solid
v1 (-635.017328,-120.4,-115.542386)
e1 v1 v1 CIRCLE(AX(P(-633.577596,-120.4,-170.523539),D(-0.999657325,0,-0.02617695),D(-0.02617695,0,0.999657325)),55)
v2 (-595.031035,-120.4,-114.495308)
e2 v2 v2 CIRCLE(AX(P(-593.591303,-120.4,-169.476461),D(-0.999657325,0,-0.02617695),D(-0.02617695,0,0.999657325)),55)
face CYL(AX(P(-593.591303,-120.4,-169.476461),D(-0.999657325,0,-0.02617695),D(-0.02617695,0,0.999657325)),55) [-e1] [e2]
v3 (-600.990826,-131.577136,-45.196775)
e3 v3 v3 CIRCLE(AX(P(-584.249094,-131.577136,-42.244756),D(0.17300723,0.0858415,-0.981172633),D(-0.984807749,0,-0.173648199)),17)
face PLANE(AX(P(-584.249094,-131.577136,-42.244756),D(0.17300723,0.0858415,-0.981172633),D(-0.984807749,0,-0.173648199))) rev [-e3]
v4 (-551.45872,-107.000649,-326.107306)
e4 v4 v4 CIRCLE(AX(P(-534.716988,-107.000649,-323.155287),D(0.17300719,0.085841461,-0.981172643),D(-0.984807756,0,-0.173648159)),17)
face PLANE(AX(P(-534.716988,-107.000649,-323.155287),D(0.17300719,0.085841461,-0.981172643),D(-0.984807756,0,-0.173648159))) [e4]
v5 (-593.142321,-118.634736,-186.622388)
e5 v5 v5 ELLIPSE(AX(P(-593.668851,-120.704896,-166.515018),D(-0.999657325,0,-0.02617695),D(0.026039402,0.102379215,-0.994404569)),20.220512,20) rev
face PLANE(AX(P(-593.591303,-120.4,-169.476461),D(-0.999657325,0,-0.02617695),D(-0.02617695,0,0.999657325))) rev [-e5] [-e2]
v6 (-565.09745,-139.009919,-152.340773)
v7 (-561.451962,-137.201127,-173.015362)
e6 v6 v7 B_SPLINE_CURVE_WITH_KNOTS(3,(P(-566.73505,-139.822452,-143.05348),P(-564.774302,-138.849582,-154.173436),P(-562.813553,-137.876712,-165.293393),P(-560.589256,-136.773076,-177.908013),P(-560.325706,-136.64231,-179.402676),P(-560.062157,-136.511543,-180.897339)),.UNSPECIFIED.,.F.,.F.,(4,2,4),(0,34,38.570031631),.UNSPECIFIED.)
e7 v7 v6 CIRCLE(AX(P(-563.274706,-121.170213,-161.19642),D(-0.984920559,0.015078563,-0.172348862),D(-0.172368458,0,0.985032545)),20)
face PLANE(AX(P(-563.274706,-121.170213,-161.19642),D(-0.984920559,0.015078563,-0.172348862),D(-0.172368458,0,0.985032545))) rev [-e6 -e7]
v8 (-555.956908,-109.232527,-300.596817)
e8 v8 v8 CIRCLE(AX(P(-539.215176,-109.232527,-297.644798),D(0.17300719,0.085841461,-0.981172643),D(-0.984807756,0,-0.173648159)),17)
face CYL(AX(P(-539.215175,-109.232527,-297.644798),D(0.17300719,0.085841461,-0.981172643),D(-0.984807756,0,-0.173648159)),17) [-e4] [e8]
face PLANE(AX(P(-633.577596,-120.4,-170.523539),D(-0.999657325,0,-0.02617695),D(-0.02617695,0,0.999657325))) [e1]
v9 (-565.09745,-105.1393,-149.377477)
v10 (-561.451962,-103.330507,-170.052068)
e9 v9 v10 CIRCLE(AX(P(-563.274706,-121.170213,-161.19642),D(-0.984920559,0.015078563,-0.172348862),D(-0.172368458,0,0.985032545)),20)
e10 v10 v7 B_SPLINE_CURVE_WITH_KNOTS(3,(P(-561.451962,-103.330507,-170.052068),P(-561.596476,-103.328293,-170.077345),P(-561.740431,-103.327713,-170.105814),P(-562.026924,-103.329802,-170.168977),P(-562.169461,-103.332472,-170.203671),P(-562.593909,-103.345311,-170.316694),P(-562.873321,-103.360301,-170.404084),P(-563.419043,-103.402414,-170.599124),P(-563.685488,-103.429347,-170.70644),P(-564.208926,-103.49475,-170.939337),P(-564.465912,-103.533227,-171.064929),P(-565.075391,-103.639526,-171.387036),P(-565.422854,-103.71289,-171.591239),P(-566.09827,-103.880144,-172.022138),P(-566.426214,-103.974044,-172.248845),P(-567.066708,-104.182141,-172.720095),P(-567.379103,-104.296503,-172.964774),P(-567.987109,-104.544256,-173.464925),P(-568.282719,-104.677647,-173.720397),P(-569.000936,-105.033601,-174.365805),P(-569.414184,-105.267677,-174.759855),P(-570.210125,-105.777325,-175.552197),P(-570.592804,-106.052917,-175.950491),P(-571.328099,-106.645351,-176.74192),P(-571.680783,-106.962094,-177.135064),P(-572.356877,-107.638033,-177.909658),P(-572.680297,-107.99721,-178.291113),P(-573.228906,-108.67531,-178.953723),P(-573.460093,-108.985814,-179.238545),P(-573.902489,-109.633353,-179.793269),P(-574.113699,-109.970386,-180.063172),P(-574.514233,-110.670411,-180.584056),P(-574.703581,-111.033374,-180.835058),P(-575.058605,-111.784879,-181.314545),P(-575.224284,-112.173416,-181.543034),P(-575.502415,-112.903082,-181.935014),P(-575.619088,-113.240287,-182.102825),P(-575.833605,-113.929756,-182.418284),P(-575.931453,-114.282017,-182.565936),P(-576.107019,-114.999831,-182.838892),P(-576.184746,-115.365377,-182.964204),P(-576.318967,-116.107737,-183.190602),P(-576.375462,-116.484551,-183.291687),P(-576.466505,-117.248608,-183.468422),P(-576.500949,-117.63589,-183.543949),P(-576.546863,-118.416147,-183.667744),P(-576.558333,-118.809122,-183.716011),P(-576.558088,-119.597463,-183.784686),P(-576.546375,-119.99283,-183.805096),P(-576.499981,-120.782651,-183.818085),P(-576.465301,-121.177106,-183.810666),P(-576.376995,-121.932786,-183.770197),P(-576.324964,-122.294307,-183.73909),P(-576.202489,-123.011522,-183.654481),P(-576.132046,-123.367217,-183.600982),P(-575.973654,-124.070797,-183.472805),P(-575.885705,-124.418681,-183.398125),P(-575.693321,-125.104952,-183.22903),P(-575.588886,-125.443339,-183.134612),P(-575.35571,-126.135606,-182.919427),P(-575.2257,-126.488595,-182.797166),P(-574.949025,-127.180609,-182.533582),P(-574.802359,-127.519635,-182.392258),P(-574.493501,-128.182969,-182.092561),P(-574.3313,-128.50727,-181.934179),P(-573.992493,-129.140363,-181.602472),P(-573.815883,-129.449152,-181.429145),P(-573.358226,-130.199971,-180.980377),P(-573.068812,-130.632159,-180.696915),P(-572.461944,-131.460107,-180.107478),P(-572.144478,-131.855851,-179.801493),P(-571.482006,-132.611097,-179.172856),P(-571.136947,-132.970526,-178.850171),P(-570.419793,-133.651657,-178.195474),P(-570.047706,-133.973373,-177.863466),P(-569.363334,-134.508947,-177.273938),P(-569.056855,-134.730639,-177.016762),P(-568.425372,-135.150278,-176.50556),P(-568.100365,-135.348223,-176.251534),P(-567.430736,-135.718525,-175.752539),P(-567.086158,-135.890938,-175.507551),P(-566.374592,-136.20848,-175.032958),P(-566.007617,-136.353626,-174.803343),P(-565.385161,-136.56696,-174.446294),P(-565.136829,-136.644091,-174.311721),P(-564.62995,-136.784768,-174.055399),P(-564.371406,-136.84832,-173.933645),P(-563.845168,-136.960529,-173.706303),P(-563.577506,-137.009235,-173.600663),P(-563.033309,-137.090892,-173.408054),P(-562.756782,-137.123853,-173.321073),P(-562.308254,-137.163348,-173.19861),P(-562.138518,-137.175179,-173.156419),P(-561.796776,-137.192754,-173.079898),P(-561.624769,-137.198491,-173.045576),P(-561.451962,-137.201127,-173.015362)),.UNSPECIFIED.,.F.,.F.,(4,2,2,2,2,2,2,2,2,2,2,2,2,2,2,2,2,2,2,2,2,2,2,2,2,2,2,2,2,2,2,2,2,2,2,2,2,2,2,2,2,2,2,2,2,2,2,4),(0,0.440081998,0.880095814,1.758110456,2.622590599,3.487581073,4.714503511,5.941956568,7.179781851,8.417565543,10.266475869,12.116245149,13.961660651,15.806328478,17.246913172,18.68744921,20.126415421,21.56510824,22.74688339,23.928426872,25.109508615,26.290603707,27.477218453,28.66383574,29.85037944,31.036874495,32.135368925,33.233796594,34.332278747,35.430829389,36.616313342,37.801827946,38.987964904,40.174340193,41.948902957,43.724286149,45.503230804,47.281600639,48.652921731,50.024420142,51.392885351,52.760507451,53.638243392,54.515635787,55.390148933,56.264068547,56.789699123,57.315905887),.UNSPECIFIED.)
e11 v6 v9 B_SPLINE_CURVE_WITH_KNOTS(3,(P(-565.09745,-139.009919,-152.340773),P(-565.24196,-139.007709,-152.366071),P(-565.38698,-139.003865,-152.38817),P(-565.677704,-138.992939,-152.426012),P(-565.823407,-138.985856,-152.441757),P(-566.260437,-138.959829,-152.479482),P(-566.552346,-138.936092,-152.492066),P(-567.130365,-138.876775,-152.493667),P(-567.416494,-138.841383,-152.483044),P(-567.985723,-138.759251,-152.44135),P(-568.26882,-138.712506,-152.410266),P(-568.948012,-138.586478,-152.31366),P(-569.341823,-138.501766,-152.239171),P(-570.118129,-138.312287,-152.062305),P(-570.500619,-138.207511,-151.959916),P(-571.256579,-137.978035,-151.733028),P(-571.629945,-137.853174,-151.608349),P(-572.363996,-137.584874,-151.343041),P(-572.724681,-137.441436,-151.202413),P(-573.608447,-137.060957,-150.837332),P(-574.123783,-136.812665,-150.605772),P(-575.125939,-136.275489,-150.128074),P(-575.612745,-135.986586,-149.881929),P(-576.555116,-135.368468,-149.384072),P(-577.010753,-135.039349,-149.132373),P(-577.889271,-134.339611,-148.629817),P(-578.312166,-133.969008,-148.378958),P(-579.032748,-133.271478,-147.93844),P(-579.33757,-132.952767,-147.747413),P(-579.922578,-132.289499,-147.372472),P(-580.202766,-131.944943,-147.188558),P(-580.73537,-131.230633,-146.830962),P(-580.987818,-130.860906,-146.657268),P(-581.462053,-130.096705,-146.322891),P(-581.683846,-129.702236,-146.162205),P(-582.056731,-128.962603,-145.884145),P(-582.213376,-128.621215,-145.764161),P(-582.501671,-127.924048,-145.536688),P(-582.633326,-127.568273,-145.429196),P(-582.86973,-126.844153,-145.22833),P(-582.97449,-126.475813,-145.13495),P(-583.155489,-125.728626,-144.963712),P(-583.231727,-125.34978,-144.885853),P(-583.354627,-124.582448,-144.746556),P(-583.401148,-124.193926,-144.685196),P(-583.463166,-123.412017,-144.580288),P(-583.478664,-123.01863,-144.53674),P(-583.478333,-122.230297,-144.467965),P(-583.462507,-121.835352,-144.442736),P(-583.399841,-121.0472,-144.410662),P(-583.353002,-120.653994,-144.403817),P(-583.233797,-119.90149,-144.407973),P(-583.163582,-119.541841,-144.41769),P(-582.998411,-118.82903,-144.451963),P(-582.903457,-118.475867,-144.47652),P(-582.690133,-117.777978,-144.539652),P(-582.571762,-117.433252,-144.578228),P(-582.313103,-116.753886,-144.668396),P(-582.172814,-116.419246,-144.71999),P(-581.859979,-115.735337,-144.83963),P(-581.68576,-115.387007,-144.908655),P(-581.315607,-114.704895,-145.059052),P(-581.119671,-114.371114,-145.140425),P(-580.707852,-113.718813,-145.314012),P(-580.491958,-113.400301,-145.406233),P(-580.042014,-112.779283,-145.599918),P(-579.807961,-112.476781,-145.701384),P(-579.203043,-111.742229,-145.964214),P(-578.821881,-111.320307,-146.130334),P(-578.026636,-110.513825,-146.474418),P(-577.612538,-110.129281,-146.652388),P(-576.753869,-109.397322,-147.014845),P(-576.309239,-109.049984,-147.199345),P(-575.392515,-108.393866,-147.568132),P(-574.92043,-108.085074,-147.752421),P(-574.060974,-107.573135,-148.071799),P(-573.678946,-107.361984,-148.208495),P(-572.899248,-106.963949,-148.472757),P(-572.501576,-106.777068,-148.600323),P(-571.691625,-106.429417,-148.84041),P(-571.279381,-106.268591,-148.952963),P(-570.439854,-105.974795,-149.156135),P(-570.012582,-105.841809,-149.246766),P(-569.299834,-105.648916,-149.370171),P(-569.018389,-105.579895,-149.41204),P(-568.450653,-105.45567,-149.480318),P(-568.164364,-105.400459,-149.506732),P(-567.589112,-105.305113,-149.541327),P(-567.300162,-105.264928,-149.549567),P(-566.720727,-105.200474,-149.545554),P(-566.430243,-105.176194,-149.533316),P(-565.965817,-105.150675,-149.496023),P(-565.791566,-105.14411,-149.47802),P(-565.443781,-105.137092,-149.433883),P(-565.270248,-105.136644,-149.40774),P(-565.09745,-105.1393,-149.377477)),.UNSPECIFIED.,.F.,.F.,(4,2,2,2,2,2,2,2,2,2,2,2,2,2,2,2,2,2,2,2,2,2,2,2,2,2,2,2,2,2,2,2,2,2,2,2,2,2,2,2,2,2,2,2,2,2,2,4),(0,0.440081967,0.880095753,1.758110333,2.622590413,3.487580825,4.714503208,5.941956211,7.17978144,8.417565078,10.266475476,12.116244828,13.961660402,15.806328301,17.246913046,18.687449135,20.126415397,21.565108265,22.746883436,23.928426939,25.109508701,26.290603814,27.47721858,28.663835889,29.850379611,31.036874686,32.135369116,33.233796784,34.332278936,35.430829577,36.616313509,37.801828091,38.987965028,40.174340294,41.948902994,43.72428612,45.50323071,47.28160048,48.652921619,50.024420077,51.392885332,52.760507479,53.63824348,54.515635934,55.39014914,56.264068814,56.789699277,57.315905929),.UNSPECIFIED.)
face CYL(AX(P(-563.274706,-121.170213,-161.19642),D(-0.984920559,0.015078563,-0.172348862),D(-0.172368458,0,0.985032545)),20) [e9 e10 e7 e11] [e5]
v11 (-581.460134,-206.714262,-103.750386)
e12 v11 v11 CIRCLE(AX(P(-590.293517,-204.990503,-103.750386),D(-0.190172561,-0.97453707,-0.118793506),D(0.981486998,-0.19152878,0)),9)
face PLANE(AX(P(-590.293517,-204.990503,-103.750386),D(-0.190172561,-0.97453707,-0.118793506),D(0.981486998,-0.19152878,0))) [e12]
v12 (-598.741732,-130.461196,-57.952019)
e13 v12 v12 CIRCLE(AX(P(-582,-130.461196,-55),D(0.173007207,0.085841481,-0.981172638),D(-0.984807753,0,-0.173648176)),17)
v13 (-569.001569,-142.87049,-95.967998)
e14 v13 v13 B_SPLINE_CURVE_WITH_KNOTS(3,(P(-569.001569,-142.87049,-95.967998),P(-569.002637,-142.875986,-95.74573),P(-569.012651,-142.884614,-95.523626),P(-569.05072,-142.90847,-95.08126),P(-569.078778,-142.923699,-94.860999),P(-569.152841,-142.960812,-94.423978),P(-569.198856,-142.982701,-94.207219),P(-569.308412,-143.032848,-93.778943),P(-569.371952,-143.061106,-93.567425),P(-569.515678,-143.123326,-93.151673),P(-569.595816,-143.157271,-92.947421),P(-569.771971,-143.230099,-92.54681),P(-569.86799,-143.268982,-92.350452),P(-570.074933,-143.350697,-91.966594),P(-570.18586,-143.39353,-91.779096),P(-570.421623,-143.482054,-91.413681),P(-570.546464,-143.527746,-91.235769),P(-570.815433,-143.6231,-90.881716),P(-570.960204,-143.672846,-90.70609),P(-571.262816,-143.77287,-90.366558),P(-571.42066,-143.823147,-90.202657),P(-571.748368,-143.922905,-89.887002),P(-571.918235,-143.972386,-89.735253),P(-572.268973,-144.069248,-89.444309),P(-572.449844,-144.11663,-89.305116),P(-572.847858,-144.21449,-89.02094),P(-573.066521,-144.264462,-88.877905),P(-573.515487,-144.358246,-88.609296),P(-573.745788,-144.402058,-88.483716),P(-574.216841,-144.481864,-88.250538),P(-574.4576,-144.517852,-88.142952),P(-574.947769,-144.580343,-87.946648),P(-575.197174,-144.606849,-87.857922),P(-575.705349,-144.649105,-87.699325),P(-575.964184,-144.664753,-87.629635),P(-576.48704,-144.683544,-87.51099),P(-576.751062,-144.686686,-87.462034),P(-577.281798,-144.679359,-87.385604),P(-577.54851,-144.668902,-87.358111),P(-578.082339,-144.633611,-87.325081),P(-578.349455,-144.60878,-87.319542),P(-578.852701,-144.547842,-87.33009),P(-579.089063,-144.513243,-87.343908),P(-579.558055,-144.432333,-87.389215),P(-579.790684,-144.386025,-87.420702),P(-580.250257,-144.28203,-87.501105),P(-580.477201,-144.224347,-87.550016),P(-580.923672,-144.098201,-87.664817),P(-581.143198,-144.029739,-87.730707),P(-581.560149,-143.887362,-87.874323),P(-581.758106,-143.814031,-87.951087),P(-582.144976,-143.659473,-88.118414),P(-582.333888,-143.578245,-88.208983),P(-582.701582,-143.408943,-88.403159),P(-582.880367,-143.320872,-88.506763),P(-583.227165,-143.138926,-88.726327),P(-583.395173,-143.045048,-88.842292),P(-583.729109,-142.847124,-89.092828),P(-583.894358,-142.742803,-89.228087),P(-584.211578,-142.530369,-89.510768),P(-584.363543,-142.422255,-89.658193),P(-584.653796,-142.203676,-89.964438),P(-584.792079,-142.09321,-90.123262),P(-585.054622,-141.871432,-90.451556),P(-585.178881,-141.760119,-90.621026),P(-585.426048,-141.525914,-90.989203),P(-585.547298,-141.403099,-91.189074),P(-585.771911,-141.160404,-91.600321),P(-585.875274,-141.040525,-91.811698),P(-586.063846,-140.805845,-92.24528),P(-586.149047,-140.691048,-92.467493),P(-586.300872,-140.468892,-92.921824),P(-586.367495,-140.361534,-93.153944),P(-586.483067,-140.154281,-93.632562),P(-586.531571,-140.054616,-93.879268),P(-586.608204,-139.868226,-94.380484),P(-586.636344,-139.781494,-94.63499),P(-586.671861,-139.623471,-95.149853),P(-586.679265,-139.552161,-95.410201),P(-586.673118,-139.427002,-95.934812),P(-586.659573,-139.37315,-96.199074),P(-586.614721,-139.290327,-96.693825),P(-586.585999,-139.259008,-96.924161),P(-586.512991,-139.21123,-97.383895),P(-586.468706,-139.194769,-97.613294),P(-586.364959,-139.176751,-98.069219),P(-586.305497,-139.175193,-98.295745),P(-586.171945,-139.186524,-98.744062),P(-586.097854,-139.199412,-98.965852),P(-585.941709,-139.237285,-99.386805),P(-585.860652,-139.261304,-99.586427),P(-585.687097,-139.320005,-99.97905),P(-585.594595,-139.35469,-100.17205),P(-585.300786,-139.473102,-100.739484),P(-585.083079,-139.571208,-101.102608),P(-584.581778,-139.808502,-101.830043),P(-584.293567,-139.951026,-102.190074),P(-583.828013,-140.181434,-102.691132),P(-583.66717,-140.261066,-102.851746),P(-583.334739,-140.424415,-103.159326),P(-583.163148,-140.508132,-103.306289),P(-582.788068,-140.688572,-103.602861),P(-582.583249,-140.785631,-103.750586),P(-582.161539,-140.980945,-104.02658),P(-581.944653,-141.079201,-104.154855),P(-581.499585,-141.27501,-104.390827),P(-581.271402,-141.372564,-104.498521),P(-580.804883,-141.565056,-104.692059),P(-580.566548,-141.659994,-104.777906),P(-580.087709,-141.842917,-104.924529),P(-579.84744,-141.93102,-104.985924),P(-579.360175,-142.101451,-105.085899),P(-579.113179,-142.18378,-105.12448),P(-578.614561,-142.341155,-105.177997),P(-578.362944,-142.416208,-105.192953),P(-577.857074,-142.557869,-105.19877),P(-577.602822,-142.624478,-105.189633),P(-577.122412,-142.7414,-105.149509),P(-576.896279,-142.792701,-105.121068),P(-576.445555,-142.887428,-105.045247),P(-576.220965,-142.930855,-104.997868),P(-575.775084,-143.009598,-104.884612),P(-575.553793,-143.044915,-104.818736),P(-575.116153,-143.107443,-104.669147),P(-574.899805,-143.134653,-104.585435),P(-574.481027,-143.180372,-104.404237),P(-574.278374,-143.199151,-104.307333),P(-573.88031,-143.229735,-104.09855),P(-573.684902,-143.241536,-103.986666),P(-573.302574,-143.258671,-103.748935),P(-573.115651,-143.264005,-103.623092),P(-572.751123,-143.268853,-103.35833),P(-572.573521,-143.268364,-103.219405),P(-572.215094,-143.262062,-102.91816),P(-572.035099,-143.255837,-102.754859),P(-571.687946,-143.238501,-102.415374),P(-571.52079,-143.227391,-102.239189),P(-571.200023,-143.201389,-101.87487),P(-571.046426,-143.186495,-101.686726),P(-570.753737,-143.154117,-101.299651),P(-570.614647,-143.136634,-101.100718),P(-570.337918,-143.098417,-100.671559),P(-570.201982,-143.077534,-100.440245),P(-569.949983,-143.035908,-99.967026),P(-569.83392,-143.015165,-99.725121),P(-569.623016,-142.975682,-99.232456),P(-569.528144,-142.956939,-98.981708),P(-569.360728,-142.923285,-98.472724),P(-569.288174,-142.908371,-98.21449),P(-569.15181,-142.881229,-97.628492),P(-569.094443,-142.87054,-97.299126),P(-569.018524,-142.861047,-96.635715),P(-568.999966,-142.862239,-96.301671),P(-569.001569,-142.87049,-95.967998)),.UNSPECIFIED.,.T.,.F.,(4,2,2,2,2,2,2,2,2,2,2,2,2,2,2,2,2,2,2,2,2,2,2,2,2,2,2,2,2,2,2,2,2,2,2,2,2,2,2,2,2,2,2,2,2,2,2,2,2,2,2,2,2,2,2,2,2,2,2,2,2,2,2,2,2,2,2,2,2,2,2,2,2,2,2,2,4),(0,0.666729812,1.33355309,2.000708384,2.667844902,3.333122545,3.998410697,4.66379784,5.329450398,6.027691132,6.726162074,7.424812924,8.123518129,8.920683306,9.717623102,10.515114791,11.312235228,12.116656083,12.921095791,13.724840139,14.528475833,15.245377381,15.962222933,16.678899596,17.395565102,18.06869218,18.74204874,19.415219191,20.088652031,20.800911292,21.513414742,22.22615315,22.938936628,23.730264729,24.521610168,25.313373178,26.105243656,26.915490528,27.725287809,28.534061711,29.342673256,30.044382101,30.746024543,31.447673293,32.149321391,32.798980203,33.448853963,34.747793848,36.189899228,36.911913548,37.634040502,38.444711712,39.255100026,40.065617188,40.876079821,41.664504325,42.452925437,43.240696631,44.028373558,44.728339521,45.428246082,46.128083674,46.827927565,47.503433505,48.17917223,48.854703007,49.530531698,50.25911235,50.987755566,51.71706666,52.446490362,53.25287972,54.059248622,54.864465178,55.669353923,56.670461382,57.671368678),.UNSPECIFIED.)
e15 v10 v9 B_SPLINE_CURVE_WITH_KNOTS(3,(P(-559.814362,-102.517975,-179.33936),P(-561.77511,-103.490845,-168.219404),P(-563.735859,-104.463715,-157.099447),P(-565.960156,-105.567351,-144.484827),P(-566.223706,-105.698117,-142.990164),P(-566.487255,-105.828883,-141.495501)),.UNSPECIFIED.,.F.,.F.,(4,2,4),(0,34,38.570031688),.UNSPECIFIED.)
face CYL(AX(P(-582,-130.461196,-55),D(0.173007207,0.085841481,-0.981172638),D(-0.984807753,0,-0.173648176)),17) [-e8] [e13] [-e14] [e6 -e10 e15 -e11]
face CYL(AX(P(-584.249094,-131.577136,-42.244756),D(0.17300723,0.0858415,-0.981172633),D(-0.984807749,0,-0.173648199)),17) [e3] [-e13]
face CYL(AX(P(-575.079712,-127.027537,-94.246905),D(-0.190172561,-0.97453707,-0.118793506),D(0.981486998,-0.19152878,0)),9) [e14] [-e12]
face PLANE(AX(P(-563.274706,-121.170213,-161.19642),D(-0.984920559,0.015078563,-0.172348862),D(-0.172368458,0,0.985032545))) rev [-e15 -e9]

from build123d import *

# Parameters (mm, degrees)
SUSP_FL_UCA_BALL_JOINT_PROFILE_R  = 17
SUSP_FL_LCA_BALL_JOINT_PROFILE_R  = 17
SUSP_FL_UPRIGHT_KINGPIN_START     = -44.924681897
SUSP_FL_UPRIGHT_KINGPIN_OUTLINE_R = 17
SUSP_FL_UPRIGHT_KINGPIN_DEPTH     = 234.300820367
SUSP_FL_UPRIGHT_SPINDLE_PROFILE_R = 20
SUSP_FL_UPRIGHT_ARM_PROFILE_R     = 9
SUSP_FL_HUB_PROFILE_R             = 55


with BuildPart() as part:
    # SUSP_FL_UCA_ball_joint: sweep along a curve in space
    with BuildLine() as susp_fl_uca_ball_joint_path:
        Line((-539.215175, -109.232527, -297.644798), (-534.716988, -107.000649, -323.155287))
    # SUSP_FL_UCA_ball_joint profile (on start of the path) → SUSP_FL_UCA_ball_joint (sweep)
    with BuildSketch(Plane(origin=(-539.215175, -109.232527, -297.644798), x_dir=(-0.9848077563247088, 0, -0.17364815888080395), z_dir=(0.1730071904249639, 0.0858414606043016, -0.981172643168663))):
        Circle(SUSP_FL_UCA_BALL_JOINT_PROFILE_R)
    sweep(path=susp_fl_uca_ball_joint_path.line)


with BuildPart() as body_2:
    # SUSP_FL_LCA_ball_joint: sweep along a curve in space
    with BuildLine() as susp_fl_lca_ball_joint_path:
        Line((-584.249094, -131.577136, -42.2447557), (-579.750906, -129.345257, -67.7552443))
    # SUSP_FL_LCA_ball_joint profile (on start of the path) → SUSP_FL_LCA_ball_joint (sweep)
    with BuildSketch(Plane(origin=(-584.249094, -131.577136, -42.2447557), x_dir=(-0.9848077492574088, 0, -0.17364819896145425), z_dir=(0.17300722977562832, 0.08584149950700166, -0.9811726328265339))):
        Circle(SUSP_FL_LCA_BALL_JOINT_PROFILE_R)
    sweep(path=susp_fl_lca_ball_joint_path.line)


with BuildPart() as susp_fl_upright_kingpin_tool:
    # SUSP_FL_upright_kingpin: read off the stored shape, not the designer's step
    # SUSP_FL_upright_kingpin outline → SUSP_FL_upright_kingpin (new body)
    with BuildSketch(Plane(origin=(0, 0, 0), x_dir=(0.9849205583589563, -0.01507857135321185, 0.17234886250807685), z_dir=(0.17300720713855208, 0.08584148118504255, -0.9811726384210254)).offset(SUSP_FL_UPRIGHT_KINGPIN_START)):
        with Locations((-580.73578395, 134.758317541)):
            Circle(SUSP_FL_UPRIGHT_KINGPIN_OUTLINE_R)
    extrude(amount=SUSP_FL_UPRIGHT_KINGPIN_DEPTH)


with BuildPart() as part_1:
    add(part.part)


with BuildPart() as part_2:
    # SUSP_FL_upright_kingpin: joined with susp_fl_upright_kingpin_tool
    add(part_1.part.fuse(susp_fl_upright_kingpin_tool.part, body_2.part, tol=0.00001))

    # SUSP_FL_upright_spindle: sweep along a curve in space
    with BuildLine() as susp_fl_upright_spindle_path:
        Line((-563.274706, -121.170213, -161.19642), (-613.584449, -120.4, -170))
    # SUSP_FL_upright_spindle profile (on start of the path) → SUSP_FL_upright_spindle (sweep)
    with BuildSketch(Plane(origin=(-563.274706, -121.170213, -161.19642), x_dir=(0.17236845779024892, 0, -0.9850325450252957), z_dir=(-0.9849205586549441, 0.015078562779446367, -0.17234886156670431))):
        Circle(SUSP_FL_UPRIGHT_SPINDLE_PROFILE_R)
    sweep(path=susp_fl_upright_spindle_path.line)

    # SUSP_FL_upright_arm: sweep along a curve in space
    with BuildLine() as susp_fl_upright_arm_path:
        Line((-575.079712, -127.027537, -94.2469055), (-590.293517, -204.990503, -103.750386))
    # SUSP_FL_upright_arm profile (on start of the path) → SUSP_FL_upright_arm (sweep)
    with BuildSketch(Plane(origin=(-575.079712, -127.027537, -94.2469055), x_dir=(-0.9814869975187847, 0.1915287803479187, 0), z_dir=(-0.19017256143460165, -0.9745370695403799, -0.1187935055844866))):
        Circle(SUSP_FL_UPRIGHT_ARM_PROFILE_R)
    sweep(path=susp_fl_upright_arm_path.line)

    # SUSP_FL_hub: sweep along a curve in space
    with BuildLine() as susp_fl_hub_path:
        Line((-593.591303, -120.4, -169.476461), (-633.577596, -120.4, -170.523539))
    # SUSP_FL_hub profile (on start of the path) → SUSP_FL_hub (sweep)
    with BuildSketch(Plane(origin=(-593.591303, -120.4, -169.476461), x_dir=(0.026176949998200826, 0, -0.9996573249312944), z_dir=(-0.9996573249312944, 0, -0.026176949998200826))):
        Circle(SUSP_FL_HUB_PROFILE_R)
    sweep(path=susp_fl_hub_path.line)


solid = part_2.part
